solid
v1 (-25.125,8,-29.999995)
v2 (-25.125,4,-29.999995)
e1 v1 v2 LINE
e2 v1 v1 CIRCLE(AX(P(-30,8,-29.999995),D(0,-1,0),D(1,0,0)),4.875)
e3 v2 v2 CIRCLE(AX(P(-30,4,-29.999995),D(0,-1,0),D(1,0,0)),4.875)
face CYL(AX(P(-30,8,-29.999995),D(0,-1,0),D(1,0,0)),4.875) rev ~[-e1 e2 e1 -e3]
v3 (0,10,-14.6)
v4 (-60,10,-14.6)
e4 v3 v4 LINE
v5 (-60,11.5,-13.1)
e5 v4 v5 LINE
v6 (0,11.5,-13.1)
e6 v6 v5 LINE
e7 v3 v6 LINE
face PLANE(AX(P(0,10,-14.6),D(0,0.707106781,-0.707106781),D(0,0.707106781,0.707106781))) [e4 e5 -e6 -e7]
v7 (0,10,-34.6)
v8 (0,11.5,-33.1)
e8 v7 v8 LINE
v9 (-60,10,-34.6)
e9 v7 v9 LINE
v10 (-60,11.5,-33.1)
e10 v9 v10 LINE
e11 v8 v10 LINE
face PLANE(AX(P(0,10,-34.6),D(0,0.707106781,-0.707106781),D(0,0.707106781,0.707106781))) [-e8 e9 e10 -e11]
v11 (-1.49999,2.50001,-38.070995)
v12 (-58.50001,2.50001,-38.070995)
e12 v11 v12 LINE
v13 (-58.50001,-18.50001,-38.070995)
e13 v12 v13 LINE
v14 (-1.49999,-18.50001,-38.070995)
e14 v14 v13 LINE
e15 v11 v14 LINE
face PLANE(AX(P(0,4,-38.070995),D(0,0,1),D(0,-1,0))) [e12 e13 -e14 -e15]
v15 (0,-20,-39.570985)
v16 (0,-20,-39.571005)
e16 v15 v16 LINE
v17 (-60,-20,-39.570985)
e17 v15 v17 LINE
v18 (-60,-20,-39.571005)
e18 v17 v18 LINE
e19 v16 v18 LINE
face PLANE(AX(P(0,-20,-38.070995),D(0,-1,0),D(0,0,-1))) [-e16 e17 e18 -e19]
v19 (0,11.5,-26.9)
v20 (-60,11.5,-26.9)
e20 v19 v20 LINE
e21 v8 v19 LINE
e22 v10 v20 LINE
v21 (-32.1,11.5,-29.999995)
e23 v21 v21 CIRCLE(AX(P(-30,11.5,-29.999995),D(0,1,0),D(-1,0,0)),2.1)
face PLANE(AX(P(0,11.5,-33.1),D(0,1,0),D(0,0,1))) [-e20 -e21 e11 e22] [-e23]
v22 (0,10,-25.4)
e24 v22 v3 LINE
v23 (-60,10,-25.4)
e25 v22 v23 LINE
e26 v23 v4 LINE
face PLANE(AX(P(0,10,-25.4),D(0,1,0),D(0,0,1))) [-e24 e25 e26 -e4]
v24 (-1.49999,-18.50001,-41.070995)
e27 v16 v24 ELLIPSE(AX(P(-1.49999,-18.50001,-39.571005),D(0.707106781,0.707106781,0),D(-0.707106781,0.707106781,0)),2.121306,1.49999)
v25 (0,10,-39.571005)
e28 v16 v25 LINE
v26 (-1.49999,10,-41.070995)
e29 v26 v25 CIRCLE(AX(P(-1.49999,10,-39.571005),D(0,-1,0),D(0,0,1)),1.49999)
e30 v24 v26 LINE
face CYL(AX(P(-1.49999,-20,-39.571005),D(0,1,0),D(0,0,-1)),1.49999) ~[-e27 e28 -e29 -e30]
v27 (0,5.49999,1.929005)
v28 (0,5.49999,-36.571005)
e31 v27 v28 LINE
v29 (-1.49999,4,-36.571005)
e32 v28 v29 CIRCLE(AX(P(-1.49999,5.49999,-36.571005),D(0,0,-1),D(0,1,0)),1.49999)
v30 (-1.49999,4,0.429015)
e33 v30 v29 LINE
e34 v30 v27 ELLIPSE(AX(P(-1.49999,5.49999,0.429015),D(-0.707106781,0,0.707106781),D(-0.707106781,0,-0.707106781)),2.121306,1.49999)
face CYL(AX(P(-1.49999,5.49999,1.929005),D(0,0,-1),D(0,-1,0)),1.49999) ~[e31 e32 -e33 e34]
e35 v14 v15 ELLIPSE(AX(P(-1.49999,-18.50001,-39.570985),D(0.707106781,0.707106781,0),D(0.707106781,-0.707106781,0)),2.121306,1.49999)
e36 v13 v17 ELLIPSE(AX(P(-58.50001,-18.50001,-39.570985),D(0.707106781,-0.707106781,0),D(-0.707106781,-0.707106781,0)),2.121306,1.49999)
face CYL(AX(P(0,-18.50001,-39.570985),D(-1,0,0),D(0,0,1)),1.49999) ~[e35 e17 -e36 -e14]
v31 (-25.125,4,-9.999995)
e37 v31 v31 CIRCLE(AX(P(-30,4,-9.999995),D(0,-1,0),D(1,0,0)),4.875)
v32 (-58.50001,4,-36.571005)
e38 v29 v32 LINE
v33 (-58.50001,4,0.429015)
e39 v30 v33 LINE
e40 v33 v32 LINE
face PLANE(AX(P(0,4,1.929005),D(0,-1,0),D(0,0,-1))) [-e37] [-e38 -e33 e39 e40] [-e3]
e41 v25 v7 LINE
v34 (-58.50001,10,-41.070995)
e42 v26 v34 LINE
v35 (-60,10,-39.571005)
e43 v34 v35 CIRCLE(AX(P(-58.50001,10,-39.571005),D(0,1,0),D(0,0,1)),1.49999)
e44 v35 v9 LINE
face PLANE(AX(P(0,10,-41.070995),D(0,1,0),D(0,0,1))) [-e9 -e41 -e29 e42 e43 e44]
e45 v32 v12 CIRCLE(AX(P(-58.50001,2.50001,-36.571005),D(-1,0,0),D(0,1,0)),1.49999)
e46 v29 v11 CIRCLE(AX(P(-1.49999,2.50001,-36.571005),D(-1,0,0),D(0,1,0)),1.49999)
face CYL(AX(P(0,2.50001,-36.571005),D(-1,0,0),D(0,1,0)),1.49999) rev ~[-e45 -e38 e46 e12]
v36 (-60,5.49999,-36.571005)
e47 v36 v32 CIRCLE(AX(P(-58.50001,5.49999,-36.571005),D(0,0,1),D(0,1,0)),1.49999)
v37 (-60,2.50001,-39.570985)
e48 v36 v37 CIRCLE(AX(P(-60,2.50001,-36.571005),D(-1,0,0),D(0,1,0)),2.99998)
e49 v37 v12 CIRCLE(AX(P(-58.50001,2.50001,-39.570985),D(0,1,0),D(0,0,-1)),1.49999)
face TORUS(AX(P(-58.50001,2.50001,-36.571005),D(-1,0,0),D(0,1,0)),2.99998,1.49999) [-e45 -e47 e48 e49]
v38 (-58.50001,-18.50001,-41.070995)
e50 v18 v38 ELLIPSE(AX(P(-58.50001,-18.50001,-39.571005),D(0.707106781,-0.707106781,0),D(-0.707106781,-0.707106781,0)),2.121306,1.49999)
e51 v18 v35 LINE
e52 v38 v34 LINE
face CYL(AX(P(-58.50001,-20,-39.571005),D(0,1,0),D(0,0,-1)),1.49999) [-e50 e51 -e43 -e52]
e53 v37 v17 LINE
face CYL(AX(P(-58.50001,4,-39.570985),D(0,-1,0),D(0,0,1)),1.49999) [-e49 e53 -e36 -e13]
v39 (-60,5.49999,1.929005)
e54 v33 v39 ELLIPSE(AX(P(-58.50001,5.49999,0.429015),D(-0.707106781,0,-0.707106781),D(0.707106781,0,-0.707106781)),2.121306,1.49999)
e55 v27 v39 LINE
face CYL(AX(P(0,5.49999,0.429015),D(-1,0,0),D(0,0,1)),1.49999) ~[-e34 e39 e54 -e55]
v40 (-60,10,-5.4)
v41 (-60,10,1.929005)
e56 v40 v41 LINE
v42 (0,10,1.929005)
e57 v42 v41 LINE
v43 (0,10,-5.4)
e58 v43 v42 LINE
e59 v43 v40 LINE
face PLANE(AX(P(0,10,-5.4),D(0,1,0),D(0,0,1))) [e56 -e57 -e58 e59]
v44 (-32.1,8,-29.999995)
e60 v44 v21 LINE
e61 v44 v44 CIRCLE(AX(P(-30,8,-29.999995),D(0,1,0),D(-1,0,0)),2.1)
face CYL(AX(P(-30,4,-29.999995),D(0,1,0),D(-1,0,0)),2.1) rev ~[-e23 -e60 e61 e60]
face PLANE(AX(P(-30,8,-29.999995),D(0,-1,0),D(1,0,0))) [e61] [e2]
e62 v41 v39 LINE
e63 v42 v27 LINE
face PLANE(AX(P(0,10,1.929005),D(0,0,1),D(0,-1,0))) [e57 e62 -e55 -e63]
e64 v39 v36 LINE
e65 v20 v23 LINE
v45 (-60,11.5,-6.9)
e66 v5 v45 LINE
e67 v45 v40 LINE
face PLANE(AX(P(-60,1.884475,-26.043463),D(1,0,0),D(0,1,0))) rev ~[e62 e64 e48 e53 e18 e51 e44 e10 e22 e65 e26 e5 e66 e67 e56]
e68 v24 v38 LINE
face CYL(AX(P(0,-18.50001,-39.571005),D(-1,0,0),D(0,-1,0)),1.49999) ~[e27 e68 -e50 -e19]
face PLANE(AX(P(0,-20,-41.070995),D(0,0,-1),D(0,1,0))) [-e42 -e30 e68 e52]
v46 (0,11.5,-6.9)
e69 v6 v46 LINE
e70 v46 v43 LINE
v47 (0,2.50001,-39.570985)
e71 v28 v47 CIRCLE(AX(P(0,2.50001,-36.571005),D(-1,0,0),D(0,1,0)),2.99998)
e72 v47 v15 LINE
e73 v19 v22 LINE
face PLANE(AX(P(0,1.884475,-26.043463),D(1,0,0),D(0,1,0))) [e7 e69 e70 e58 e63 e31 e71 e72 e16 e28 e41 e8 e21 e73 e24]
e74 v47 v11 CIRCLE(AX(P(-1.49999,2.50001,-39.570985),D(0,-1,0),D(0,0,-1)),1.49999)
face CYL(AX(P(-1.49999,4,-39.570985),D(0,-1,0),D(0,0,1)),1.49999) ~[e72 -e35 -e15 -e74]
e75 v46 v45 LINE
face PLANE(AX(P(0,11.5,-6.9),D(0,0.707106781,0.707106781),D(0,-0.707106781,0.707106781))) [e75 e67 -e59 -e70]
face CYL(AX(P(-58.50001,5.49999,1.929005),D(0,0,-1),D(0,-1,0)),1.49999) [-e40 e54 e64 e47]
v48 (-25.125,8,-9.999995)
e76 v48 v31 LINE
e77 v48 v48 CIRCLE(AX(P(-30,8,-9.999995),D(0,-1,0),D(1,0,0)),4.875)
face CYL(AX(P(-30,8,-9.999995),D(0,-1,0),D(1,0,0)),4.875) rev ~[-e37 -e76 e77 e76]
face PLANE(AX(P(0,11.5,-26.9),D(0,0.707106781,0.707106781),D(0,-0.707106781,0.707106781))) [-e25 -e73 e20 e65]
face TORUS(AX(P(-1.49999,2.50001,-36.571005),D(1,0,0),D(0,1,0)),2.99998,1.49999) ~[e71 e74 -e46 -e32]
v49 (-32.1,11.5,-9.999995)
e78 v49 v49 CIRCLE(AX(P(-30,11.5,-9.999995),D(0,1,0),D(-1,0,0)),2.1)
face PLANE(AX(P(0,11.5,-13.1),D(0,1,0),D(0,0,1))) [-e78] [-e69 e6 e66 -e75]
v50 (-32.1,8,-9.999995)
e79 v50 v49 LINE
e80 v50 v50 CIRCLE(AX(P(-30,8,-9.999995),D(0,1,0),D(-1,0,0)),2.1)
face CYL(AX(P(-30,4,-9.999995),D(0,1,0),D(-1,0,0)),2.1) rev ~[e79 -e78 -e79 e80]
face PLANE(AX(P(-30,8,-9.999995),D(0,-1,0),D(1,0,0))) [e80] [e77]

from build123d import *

# Parameters (mm, degrees)
F1_DEPTH       = 60
F2_R           = 1.49999
F4_D           = 4.2
F4_CBORE_D     = 9.75
F4_CBORE_DEPTH = 4


# Not quite as in the source:
# - a fillet or chamfer is up to 0.001 mm smaller than in the source, because OpenCascade refuses the exact size
# - a feature names something its author has since deleted; it is built from what else it names


with BuildPart() as f1:
    # F0 (on Right) → F1 (new body)
    with BuildSketch(Plane.YZ):
        Polygon((10, 1.9290046394), (4, 1.9290046394), (4, -38.0709953606), (-20, -38.0709953606), (-20, -41.0709953606), (10, -41.0709953606), (10, -34.6), (11.5, -33.1), (11.5, -26.9), (10, -25.4), (10, -14.6), (11.5, -13.1), (11.5, -6.9), (10, -5.4), align=None)
    extrude(amount=-F1_DEPTH)

    # F2 (radius 1.5 in the source; OpenCascade refuses exactly that, so slightly less here)
    f2_edges = [f1.edges().sort_by_distance(p)[0] for p in [
        (0, 4, -18.070995),
        (-60, 4, -18.070995),
        (0, -8, -38.070995),
        (-30, -20, -38.070995),
        (-60, -8, -38.070995),
        (-30, 4, -38.070995),
        (-30, -20, -41.070995),
        (0, -5, -41.070995),
        (-60, -5, -41.070995),
        (-30, 4, 1.929005),
    ]]
    fillet(f2_edges, radius=F2_R)

    # F4 (through all)
    with Locations(Plane.XZ.offset(-4)):
        with Locations((-30, -9.9999953606), (-30, -29.9999953606)):
            CounterBoreHole(F4_D / 2, F4_CBORE_D / 2, F4_CBORE_DEPTH)


solid = f1.part
